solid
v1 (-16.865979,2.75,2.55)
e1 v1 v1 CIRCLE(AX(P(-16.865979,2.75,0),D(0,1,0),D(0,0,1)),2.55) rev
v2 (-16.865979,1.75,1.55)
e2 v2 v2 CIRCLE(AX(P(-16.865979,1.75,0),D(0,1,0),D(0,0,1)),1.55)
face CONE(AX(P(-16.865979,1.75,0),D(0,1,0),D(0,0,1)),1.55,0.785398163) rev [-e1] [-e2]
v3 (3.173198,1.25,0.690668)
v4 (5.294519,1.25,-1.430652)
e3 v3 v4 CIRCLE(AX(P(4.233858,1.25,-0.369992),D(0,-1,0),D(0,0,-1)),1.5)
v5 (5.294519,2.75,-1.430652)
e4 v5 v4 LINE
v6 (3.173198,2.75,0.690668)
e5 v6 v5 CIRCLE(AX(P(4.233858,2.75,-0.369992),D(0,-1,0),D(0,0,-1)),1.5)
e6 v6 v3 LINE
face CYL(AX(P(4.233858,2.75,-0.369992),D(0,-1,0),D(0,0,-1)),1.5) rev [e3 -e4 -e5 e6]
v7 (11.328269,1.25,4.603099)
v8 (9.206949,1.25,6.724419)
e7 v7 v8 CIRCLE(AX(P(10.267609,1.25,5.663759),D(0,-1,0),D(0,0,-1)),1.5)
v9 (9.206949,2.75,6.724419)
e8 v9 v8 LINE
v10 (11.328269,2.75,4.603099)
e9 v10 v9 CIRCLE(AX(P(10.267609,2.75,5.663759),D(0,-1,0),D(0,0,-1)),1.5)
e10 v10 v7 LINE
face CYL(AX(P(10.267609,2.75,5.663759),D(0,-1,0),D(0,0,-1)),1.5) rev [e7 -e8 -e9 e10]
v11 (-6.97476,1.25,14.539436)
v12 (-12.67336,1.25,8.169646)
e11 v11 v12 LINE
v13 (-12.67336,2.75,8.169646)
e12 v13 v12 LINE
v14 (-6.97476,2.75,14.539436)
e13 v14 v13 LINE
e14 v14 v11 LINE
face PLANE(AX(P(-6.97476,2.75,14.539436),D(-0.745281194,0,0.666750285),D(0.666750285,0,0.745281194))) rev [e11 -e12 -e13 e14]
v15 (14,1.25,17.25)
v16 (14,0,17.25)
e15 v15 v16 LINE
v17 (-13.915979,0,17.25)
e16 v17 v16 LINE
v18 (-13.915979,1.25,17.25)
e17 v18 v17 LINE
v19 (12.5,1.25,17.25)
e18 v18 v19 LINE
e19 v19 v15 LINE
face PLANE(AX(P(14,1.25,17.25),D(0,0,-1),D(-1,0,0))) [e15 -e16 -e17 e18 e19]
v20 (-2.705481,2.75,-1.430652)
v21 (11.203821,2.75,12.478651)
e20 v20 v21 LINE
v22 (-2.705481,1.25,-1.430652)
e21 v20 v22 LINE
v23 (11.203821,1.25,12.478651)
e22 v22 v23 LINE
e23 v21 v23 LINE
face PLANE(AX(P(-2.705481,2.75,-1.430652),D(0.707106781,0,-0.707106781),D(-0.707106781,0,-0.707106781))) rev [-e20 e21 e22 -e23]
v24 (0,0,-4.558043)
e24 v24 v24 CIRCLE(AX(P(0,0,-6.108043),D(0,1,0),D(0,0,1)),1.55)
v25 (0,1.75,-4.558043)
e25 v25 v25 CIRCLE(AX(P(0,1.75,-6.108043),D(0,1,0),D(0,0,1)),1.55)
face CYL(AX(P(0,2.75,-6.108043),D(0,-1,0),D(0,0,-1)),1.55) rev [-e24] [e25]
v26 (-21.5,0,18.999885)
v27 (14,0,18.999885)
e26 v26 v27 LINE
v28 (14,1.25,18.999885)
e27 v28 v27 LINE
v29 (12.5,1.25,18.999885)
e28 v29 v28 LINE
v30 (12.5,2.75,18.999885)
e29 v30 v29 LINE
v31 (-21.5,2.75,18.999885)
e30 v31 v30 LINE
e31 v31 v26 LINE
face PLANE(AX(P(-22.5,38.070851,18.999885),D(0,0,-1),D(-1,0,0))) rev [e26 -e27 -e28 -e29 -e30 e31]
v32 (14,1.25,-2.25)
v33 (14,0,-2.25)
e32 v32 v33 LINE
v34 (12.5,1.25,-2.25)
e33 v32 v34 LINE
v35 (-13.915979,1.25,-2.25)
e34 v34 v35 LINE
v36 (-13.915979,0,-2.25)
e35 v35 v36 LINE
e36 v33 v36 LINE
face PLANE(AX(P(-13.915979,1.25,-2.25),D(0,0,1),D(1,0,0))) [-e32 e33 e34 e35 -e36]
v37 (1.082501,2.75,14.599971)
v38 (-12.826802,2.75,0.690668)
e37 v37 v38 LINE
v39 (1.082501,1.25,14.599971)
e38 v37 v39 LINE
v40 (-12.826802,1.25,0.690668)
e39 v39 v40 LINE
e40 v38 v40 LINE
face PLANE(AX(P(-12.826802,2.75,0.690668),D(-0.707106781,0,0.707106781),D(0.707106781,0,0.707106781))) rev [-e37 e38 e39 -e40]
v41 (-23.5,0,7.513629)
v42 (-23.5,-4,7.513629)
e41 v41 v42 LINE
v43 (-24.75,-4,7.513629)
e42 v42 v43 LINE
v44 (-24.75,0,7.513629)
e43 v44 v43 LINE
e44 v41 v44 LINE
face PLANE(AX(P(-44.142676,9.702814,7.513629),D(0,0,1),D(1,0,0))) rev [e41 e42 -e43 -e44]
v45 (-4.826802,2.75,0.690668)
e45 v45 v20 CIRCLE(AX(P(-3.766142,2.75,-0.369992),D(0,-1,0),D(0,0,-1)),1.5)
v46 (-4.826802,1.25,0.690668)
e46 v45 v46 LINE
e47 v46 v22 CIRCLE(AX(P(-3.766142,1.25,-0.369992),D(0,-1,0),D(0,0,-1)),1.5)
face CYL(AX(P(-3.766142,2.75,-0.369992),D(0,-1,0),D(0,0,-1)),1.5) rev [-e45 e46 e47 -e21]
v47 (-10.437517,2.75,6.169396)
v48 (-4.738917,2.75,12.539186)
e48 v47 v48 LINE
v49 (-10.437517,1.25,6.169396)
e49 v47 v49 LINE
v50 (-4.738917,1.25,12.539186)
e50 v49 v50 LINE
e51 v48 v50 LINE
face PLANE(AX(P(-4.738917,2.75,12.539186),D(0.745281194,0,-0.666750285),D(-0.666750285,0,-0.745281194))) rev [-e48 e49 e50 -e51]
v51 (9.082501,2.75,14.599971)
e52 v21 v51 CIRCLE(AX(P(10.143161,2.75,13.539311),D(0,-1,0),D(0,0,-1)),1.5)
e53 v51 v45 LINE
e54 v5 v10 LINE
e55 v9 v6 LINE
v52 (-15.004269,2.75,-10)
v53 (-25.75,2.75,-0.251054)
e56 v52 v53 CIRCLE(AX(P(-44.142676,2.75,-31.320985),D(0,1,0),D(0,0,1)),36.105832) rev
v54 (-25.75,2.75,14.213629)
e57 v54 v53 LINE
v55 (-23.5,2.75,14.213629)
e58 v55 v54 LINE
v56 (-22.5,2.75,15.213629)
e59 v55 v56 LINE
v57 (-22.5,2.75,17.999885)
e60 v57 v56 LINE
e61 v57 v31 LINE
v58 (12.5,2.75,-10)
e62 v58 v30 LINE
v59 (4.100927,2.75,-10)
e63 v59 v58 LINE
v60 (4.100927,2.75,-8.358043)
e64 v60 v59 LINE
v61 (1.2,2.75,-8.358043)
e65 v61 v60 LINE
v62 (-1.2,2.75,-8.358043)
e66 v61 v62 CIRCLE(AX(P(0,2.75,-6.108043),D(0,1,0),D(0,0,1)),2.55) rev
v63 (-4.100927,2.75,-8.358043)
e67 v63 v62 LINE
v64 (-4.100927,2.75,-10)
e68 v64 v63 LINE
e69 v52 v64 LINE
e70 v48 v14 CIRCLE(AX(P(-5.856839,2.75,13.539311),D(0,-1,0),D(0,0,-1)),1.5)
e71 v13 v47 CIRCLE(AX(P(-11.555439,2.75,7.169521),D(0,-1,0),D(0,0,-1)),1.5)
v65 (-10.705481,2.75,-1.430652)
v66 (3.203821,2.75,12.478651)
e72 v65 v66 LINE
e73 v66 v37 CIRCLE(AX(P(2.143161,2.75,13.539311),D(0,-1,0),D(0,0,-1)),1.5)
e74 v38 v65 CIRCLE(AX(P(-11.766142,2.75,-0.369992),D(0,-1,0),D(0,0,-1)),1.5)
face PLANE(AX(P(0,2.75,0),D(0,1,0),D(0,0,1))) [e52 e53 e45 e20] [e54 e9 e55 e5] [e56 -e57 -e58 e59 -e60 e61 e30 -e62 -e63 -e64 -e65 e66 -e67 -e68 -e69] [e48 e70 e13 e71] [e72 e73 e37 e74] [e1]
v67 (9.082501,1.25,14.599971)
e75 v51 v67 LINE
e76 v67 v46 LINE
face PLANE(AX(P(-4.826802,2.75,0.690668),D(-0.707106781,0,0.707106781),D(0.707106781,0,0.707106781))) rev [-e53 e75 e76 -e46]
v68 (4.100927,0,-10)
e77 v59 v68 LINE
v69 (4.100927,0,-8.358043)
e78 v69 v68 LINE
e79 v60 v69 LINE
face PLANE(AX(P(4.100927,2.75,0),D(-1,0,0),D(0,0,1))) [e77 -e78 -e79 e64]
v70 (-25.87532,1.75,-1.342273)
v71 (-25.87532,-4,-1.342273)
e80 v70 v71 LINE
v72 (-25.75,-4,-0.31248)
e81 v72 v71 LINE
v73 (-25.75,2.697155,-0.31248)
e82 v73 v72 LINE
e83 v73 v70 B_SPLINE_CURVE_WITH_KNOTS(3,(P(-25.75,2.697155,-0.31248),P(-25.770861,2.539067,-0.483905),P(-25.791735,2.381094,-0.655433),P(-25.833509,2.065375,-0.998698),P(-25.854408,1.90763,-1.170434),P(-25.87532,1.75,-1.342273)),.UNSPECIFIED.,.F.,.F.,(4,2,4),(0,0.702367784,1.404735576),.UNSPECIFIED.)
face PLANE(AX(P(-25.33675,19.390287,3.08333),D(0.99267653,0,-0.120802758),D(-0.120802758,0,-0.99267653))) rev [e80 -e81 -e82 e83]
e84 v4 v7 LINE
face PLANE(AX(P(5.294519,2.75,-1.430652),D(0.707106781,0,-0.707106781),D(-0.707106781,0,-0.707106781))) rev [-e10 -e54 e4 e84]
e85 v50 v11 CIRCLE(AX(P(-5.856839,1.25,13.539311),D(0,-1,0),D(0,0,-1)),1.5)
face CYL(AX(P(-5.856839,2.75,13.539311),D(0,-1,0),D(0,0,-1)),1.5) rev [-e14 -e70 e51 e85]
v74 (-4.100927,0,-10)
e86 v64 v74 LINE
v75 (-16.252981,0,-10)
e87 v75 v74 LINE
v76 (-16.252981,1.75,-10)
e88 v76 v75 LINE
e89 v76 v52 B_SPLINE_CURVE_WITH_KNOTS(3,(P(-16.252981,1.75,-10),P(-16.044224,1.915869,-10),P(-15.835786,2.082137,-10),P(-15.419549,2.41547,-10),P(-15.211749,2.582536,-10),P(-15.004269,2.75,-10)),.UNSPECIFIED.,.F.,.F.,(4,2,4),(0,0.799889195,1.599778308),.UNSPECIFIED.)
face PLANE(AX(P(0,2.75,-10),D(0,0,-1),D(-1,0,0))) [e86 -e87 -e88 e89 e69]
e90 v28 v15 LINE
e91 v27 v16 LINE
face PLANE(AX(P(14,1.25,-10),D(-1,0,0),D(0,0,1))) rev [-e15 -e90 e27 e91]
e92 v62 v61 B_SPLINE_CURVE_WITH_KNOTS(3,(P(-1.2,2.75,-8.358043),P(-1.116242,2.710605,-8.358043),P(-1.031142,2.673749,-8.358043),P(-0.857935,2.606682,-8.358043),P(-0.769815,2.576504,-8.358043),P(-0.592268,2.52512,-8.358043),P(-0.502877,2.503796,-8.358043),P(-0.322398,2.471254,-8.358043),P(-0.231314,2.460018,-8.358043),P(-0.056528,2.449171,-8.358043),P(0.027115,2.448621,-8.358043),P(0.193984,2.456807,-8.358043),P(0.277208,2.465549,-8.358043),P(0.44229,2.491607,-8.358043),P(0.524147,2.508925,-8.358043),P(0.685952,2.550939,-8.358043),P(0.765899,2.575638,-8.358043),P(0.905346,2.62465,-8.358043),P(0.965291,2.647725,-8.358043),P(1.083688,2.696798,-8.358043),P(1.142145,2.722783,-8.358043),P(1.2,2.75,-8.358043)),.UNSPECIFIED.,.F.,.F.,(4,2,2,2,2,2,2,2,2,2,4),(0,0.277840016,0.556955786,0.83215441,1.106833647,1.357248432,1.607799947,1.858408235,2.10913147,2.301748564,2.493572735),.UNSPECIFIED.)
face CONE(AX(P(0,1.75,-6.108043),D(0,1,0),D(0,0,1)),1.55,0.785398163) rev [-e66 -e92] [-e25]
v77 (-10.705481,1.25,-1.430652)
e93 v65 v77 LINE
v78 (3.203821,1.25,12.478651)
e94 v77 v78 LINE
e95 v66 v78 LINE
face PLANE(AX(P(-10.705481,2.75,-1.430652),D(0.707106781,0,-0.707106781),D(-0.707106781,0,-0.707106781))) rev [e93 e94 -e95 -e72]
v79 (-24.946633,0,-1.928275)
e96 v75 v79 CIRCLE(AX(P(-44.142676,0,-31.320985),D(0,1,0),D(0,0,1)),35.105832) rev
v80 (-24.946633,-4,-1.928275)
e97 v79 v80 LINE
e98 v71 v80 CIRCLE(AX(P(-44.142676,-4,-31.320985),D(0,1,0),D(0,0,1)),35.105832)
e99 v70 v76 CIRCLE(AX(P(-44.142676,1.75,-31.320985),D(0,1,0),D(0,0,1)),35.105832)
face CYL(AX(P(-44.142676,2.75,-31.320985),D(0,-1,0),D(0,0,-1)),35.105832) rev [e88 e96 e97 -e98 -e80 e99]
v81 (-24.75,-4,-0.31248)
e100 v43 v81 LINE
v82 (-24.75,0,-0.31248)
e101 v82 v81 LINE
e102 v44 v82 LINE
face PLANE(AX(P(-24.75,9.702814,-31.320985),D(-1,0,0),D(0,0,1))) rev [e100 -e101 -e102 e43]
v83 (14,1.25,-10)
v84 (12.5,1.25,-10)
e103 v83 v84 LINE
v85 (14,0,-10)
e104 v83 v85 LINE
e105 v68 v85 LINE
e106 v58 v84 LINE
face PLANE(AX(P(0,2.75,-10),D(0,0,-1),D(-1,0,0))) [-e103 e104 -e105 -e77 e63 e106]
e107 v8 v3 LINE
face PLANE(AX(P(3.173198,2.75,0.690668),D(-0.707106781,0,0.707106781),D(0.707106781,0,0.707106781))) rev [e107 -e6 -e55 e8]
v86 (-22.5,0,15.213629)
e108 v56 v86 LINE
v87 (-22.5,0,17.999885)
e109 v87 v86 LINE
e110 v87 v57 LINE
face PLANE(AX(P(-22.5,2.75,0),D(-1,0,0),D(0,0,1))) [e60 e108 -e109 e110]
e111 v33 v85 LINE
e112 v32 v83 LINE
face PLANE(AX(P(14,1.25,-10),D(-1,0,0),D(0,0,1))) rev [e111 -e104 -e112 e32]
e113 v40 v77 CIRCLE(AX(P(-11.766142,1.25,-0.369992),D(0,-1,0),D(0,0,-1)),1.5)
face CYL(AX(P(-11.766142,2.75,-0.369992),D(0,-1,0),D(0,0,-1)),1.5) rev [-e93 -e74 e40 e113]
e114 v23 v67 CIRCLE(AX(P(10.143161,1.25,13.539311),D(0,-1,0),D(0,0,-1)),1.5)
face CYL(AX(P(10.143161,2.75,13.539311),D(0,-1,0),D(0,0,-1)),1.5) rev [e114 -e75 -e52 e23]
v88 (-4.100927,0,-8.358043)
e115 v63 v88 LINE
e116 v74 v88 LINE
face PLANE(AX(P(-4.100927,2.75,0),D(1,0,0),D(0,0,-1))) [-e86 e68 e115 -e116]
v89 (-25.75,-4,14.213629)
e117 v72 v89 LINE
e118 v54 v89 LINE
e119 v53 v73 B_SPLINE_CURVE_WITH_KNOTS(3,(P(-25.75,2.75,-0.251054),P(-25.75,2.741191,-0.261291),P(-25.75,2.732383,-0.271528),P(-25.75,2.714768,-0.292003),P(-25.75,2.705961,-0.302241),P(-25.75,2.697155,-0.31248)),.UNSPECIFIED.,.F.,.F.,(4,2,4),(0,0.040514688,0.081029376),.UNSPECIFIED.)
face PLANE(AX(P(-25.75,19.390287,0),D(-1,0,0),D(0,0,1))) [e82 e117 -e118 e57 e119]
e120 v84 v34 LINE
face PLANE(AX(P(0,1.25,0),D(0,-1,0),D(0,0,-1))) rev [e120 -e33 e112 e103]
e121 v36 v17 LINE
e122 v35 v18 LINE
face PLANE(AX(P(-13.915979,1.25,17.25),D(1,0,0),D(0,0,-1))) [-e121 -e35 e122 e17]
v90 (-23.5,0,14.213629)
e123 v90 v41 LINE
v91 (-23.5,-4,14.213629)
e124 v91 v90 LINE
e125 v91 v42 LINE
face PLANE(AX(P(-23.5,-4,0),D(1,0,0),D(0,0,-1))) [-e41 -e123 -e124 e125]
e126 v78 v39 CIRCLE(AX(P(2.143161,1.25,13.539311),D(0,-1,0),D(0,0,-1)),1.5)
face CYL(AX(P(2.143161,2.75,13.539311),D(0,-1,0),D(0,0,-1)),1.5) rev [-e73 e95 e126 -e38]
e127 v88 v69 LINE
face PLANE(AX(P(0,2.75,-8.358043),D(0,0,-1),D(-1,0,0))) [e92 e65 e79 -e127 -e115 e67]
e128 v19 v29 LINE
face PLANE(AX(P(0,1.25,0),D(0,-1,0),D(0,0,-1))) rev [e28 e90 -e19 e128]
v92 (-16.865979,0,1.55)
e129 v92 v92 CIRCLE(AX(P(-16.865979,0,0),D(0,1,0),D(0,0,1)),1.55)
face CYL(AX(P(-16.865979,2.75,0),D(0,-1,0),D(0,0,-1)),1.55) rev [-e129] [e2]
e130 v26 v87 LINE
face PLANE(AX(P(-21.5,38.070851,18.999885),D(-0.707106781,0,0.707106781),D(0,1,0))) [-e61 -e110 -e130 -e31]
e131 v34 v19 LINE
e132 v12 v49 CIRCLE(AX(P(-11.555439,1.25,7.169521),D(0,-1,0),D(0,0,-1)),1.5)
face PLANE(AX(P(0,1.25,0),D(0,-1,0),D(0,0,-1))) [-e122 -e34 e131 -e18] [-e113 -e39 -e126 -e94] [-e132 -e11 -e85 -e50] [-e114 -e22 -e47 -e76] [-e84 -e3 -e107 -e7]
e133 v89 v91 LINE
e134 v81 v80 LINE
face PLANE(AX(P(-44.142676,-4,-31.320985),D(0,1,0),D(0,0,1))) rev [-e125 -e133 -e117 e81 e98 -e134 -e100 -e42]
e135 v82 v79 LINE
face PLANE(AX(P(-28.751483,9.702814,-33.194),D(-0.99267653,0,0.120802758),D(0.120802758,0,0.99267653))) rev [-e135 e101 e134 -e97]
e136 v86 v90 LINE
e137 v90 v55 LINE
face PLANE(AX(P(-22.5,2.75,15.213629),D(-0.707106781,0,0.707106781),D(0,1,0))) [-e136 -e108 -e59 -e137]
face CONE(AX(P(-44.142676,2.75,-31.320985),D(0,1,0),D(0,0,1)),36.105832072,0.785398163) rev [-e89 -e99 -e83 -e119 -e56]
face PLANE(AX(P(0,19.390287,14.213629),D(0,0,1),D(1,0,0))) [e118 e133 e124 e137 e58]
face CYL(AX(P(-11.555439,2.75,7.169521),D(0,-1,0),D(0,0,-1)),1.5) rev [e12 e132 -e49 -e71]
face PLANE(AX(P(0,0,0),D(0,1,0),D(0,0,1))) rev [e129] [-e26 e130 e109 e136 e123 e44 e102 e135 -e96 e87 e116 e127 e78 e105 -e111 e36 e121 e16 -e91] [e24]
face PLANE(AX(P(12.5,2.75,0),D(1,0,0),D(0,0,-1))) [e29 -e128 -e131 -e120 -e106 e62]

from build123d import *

# Parameters (mm, degrees)
SKETCH_221_R           = 1.55
EXTRUDE_926_DEPTH      = 2.75
SKETCH_1005_W          = 35.000000002
SKETCH_1005_H          = 4.75
EXTRUDE_1111_DEPTH     = 2.75
EXTRUDE_1_DEPTH        = 2.75
F_2_PCB_START          = -4
F_2_PCB_DEPTH          = 4
SKETCH_2154_W          = 1.5
SKETCH_2154_H          = 28.99988509
EXTRUDE_2226_DEPTH     = 1.25
SKETCH_2278_W          = 27.915979255
SKETCH_2278_H          = 19.5
PCB_DEPTH              = 1.25
CUT_EXTRUDE_2_DEPTH    = 33.528299963
CHAMFER_1_SIZE         = 1
CHAMFER_2_SIZE         = 1
CUT_EXTRUDE_3384_DEPTH = 4


with BuildPart() as part:
    # Sketch 221 → Extrude 926 (new body)
    with BuildSketch(Plane(origin=(0, 0, 0), x_dir=(1, 0, 0), z_dir=(0, 1, 0))):
        with BuildLine():
            ThreePointArc((-16.252981126, 10), (-20.15501929, 5.688743466), (-24.715186194, 2.08073674))
            Line((-24.715186194, 2.08073674), (-24.500000002, 0.312480077))
            Line((-24.500000002, 0.312480077), (-24.500000002, -7.263629174))
            Line((-24.500000002, -7.263629174), (-22.500000002, -7.263629174))
            Line((-22.500000002, -7.263629174), (-22.500000002, -14.24988509))
            Line((-22.500000002, -14.24988509), (12.5, -14.24988509))
            Line((12.5, -14.24988509), (12.5, 10))
            Line((12.5, 10), (4.100927374, 10))
            Line((4.100927374, 10), (4.100927374, 8.35804307))
            Line((4.100927374, 8.35804307), (-4.100927378, 8.35804307))
            Line((-4.100927378, 8.35804307), (-4.100927378, 10))
            Line((-4.100927378, 10), (-16.252981126, 10))
        make_face()
        with Locations(Location((-16.865979255, 0, 0), (0, 0, 270))):
            Circle(SKETCH_221_R, mode=Mode.SUBTRACT)
        with Locations(Location((-2e-09, 6.108043073, 0), (0, 0, 270))):
            Circle(SKETCH_221_R, mode=Mode.SUBTRACT)
    extrude(amount=EXTRUDE_926_DEPTH)

    # Sketch 1005 → Extrude 1111 (add)
    with BuildSketch(Plane(origin=(0, 0, 0), x_dir=(1, 0, 0), z_dir=(0, 1, 0))):
        with Locations((-5.000000001, -16.62488509)):
            Rectangle(SKETCH_1005_W, SKETCH_1005_H)
    extrude(amount=EXTRUDE_1111_DEPTH)

    # Sketch 1191 → 卡榫结构-1 (add)
    with BuildSketch(Plane(origin=(0, 0, 0), x_dir=(1, 0, 0), z_dir=(0, 1, 0))):
        with BuildLine():
            Line((-25.750000002, -14.213629174), (-22.500000002, -14.213629174))
            Line((-22.500000002, -14.213629174), (-22.500000002, -7.263629174))
            Line((-22.500000002, -7.263629174), (-24.500000002, -7.263629174))
            Line((-24.500000002, -7.263629174), (-24.500000002, 0.312480077))
            Line((-24.500000002, 0.312480077), (-24.715186194, 2.08073674))
            ThreePointArc((-24.715186194, 2.08073674), (-25.291636518, 1.705823535), (-25.875319612, 1.342273079))
            Line((-25.875319612, 1.342273079), (-25.750000002, 0.312480077))
            Line((-25.750000002, 0.312480077), (-25.750000002, -14.213629174))
        make_face()
    extrude(amount=EXTRUDE_1_DEPTH)

    # 草图5<4> → 卡榫结构-2-注意PCB凸出部分 (add)
    with BuildSketch(Plane(origin=(0, 0, 0), x_dir=(1, 0, 0), z_dir=(0, 1, 0)).offset(F_2_PCB_START)):
        with BuildLine():
            Line((-25.750000002, -14.213629174), (-23.500000002, -14.213629174))
            Line((-23.500000002, -14.213629174), (-23.500000002, -7.263629174))
            Line((-23.500000002, -7.263629174), (-24.500000002, -7.263629174))
            Line((-24.500000002, -7.263629174), (-24.500000002, 0.312480077))
            Line((-24.500000002, 0.312480077), (-24.715186194, 2.08073674))
            ThreePointArc((-24.715186194, 2.08073674), (-25.291636518, 1.705823535), (-25.875319612, 1.342273079))
            Line((-25.875319612, 1.342273079), (-25.750000002, 0.312480077))
            Line((-25.750000002, 0.312480077), (-25.750000002, -14.213629174))
        make_face()
    extrude(amount=F_2_PCB_DEPTH)

    # Sketch 2154 → Extrude 2226 (add)
    with BuildSketch(Plane(origin=(0, 0, 0), x_dir=(1, 0, 0), z_dir=(0, 1, 0))):
        with Locations((13.25, -4.499942545)):
            Rectangle(SKETCH_2154_W, SKETCH_2154_H)
    extrude(amount=EXTRUDE_2226_DEPTH)

    # Sketch 2278 → 稳压PCB器件高度补偿 (cut)
    with BuildSketch(Plane(origin=(0, 0, 0), x_dir=(1, 0, 0), z_dir=(0, 1, 0))):
        with Locations((0.042010372, -7.5)):
            Rectangle(SKETCH_2278_W, SKETCH_2278_H)
    extrude(amount=PCB_DEPTH, mode=Mode.SUBTRACT)

    # Sketch 2514 → 切除-拉伸2 (cut, through all)
    with BuildSketch(Plane.XZ.offset(-1.25)):
        with BuildLine():
            Line((3.173198201, 0.69066828), (9.20694903, 6.724419109))
            ThreePointArc((9.20694903, 6.724419109), (11.328269373, 6.724419109), (11.328269373, 4.603098766))
            Line((11.328269373, 4.603098766), (5.294518544, -1.430652063))
            ThreePointArc((5.294518544, -1.430652063), (3.173198201, -1.430652063), (3.173198201, 0.69066828))
        make_face()
        with BuildLine():
            Line((-4.826801799, 0.69066828), (9.08250112, 14.5999712))
            ThreePointArc((9.08250112, 14.5999712), (11.203821464, 14.5999712), (11.203821464, 12.478650856))
            Line((11.203821464, 12.478650856), (-2.705481456, -1.430652063))
            ThreePointArc((-2.705481456, -1.430652063), (-4.826801799, -1.430652063), (-4.826801799, 0.69066828))
        make_face()
        with BuildLine():
            Line((-12.826801799, 0.69066828), (1.08250112, 14.5999712))
            ThreePointArc((1.08250112, 14.5999712), (3.203821464, 14.5999712), (3.203821464, 12.478650856))
            Line((3.203821464, 12.478650856), (-10.705481456, -1.430652063))
            ThreePointArc((-10.705481456, -1.430652063), (-12.826801799, -1.430652063), (-12.826801799, 0.69066828))
        make_face()
        with BuildLine():
            Line((-4.738916917, 12.539185601), (-10.437516852, 6.169395501))
            ThreePointArc((-10.437516852, 6.169395501), (-12.555564069, 6.051599138), (-12.673360433, 8.169646355))
            Line((-12.673360433, 8.169646355), (-6.974760498, 14.539436455))
            ThreePointArc((-6.974760498, 14.539436455), (-4.856713281, 14.657232819), (-4.738916917, 12.539185601))
        make_face()
    extrude(amount=-CUT_EXTRUDE_2_DEPTH, mode=Mode.SUBTRACT)

    # 倒角1
    chamfer_1_edges = [part.edges().sort_by_distance(p)[0] for p in [
        (-20.661675073, 2.75, -5.223818951),
        (-22.500000002, 1.375, 18.99988509),
        (-22.500000002, 1.375, 14.213629174),
    ]]
    chamfer(chamfer_1_edges, length=CHAMFER_1_SIZE)

    # 倒角2
    # the kernel refuses this chamfer: 1 mm, written as the material it takes off along each edge
    with BuildSketch(Plane(origin=(-2e-09, 2.75, -6.108043073), x_dir=(0, 0, 1), z_dir=(-1, 0, 0))) as chamfer_2_piece_1:
        Polygon((1.55 + CHAMFER_2_SIZE, 0), (1.55, -CHAMFER_2_SIZE), (1.55, 0), align=None)
    revolve(axis=Axis((-2e-09, 2.75, -6.108043073), (0, 1, 0)), mode=Mode.SUBTRACT)
    with BuildSketch(Plane(origin=(-16.865979255, 2.75, 0), x_dir=(0, 0, 1), z_dir=(-1, 0, 0))) as chamfer_2_piece_2:
        Polygon((1.55 + CHAMFER_2_SIZE, 0), (1.55, -CHAMFER_2_SIZE), (1.55, 0), align=None)
    revolve(axis=Axis((-16.865979255, 2.75, 0), (0, 1, 0)), mode=Mode.SUBTRACT)

    # 草图1 → Cut-Extrude 3384 (cut)
    with BuildSketch(Plane.XZ.offset(4)):
        with BuildLine():
            Line((-24.715186194, -2.08073674), (-24.500000002, -0.312480077))
            Line((-24.500000002, -0.312480077), (-24.500000002, 7.263629174))
            Line((-24.500000002, 7.263629174), (-23.500000002, 7.263629174))
            Line((-23.500000002, 7.263629174), (-23.500000002, 7.513629174))
            Line((-23.500000002, 7.513629174), (-24.750000002, 7.513629174))
            Line((-24.750000002, 7.513629174), (-24.750000002, -0.312480077))
            Line((-24.750000002, -0.312480077), (-24.946632534, -1.928275128))
            ThreePointArc((-24.946632534, -1.928275128), (-24.830758909, -2.004277534), (-24.715186194, -2.08073674))
        make_face()
    extrude(amount=-CUT_EXTRUDE_3384_DEPTH, mode=Mode.SUBTRACT)


solid = part.part
